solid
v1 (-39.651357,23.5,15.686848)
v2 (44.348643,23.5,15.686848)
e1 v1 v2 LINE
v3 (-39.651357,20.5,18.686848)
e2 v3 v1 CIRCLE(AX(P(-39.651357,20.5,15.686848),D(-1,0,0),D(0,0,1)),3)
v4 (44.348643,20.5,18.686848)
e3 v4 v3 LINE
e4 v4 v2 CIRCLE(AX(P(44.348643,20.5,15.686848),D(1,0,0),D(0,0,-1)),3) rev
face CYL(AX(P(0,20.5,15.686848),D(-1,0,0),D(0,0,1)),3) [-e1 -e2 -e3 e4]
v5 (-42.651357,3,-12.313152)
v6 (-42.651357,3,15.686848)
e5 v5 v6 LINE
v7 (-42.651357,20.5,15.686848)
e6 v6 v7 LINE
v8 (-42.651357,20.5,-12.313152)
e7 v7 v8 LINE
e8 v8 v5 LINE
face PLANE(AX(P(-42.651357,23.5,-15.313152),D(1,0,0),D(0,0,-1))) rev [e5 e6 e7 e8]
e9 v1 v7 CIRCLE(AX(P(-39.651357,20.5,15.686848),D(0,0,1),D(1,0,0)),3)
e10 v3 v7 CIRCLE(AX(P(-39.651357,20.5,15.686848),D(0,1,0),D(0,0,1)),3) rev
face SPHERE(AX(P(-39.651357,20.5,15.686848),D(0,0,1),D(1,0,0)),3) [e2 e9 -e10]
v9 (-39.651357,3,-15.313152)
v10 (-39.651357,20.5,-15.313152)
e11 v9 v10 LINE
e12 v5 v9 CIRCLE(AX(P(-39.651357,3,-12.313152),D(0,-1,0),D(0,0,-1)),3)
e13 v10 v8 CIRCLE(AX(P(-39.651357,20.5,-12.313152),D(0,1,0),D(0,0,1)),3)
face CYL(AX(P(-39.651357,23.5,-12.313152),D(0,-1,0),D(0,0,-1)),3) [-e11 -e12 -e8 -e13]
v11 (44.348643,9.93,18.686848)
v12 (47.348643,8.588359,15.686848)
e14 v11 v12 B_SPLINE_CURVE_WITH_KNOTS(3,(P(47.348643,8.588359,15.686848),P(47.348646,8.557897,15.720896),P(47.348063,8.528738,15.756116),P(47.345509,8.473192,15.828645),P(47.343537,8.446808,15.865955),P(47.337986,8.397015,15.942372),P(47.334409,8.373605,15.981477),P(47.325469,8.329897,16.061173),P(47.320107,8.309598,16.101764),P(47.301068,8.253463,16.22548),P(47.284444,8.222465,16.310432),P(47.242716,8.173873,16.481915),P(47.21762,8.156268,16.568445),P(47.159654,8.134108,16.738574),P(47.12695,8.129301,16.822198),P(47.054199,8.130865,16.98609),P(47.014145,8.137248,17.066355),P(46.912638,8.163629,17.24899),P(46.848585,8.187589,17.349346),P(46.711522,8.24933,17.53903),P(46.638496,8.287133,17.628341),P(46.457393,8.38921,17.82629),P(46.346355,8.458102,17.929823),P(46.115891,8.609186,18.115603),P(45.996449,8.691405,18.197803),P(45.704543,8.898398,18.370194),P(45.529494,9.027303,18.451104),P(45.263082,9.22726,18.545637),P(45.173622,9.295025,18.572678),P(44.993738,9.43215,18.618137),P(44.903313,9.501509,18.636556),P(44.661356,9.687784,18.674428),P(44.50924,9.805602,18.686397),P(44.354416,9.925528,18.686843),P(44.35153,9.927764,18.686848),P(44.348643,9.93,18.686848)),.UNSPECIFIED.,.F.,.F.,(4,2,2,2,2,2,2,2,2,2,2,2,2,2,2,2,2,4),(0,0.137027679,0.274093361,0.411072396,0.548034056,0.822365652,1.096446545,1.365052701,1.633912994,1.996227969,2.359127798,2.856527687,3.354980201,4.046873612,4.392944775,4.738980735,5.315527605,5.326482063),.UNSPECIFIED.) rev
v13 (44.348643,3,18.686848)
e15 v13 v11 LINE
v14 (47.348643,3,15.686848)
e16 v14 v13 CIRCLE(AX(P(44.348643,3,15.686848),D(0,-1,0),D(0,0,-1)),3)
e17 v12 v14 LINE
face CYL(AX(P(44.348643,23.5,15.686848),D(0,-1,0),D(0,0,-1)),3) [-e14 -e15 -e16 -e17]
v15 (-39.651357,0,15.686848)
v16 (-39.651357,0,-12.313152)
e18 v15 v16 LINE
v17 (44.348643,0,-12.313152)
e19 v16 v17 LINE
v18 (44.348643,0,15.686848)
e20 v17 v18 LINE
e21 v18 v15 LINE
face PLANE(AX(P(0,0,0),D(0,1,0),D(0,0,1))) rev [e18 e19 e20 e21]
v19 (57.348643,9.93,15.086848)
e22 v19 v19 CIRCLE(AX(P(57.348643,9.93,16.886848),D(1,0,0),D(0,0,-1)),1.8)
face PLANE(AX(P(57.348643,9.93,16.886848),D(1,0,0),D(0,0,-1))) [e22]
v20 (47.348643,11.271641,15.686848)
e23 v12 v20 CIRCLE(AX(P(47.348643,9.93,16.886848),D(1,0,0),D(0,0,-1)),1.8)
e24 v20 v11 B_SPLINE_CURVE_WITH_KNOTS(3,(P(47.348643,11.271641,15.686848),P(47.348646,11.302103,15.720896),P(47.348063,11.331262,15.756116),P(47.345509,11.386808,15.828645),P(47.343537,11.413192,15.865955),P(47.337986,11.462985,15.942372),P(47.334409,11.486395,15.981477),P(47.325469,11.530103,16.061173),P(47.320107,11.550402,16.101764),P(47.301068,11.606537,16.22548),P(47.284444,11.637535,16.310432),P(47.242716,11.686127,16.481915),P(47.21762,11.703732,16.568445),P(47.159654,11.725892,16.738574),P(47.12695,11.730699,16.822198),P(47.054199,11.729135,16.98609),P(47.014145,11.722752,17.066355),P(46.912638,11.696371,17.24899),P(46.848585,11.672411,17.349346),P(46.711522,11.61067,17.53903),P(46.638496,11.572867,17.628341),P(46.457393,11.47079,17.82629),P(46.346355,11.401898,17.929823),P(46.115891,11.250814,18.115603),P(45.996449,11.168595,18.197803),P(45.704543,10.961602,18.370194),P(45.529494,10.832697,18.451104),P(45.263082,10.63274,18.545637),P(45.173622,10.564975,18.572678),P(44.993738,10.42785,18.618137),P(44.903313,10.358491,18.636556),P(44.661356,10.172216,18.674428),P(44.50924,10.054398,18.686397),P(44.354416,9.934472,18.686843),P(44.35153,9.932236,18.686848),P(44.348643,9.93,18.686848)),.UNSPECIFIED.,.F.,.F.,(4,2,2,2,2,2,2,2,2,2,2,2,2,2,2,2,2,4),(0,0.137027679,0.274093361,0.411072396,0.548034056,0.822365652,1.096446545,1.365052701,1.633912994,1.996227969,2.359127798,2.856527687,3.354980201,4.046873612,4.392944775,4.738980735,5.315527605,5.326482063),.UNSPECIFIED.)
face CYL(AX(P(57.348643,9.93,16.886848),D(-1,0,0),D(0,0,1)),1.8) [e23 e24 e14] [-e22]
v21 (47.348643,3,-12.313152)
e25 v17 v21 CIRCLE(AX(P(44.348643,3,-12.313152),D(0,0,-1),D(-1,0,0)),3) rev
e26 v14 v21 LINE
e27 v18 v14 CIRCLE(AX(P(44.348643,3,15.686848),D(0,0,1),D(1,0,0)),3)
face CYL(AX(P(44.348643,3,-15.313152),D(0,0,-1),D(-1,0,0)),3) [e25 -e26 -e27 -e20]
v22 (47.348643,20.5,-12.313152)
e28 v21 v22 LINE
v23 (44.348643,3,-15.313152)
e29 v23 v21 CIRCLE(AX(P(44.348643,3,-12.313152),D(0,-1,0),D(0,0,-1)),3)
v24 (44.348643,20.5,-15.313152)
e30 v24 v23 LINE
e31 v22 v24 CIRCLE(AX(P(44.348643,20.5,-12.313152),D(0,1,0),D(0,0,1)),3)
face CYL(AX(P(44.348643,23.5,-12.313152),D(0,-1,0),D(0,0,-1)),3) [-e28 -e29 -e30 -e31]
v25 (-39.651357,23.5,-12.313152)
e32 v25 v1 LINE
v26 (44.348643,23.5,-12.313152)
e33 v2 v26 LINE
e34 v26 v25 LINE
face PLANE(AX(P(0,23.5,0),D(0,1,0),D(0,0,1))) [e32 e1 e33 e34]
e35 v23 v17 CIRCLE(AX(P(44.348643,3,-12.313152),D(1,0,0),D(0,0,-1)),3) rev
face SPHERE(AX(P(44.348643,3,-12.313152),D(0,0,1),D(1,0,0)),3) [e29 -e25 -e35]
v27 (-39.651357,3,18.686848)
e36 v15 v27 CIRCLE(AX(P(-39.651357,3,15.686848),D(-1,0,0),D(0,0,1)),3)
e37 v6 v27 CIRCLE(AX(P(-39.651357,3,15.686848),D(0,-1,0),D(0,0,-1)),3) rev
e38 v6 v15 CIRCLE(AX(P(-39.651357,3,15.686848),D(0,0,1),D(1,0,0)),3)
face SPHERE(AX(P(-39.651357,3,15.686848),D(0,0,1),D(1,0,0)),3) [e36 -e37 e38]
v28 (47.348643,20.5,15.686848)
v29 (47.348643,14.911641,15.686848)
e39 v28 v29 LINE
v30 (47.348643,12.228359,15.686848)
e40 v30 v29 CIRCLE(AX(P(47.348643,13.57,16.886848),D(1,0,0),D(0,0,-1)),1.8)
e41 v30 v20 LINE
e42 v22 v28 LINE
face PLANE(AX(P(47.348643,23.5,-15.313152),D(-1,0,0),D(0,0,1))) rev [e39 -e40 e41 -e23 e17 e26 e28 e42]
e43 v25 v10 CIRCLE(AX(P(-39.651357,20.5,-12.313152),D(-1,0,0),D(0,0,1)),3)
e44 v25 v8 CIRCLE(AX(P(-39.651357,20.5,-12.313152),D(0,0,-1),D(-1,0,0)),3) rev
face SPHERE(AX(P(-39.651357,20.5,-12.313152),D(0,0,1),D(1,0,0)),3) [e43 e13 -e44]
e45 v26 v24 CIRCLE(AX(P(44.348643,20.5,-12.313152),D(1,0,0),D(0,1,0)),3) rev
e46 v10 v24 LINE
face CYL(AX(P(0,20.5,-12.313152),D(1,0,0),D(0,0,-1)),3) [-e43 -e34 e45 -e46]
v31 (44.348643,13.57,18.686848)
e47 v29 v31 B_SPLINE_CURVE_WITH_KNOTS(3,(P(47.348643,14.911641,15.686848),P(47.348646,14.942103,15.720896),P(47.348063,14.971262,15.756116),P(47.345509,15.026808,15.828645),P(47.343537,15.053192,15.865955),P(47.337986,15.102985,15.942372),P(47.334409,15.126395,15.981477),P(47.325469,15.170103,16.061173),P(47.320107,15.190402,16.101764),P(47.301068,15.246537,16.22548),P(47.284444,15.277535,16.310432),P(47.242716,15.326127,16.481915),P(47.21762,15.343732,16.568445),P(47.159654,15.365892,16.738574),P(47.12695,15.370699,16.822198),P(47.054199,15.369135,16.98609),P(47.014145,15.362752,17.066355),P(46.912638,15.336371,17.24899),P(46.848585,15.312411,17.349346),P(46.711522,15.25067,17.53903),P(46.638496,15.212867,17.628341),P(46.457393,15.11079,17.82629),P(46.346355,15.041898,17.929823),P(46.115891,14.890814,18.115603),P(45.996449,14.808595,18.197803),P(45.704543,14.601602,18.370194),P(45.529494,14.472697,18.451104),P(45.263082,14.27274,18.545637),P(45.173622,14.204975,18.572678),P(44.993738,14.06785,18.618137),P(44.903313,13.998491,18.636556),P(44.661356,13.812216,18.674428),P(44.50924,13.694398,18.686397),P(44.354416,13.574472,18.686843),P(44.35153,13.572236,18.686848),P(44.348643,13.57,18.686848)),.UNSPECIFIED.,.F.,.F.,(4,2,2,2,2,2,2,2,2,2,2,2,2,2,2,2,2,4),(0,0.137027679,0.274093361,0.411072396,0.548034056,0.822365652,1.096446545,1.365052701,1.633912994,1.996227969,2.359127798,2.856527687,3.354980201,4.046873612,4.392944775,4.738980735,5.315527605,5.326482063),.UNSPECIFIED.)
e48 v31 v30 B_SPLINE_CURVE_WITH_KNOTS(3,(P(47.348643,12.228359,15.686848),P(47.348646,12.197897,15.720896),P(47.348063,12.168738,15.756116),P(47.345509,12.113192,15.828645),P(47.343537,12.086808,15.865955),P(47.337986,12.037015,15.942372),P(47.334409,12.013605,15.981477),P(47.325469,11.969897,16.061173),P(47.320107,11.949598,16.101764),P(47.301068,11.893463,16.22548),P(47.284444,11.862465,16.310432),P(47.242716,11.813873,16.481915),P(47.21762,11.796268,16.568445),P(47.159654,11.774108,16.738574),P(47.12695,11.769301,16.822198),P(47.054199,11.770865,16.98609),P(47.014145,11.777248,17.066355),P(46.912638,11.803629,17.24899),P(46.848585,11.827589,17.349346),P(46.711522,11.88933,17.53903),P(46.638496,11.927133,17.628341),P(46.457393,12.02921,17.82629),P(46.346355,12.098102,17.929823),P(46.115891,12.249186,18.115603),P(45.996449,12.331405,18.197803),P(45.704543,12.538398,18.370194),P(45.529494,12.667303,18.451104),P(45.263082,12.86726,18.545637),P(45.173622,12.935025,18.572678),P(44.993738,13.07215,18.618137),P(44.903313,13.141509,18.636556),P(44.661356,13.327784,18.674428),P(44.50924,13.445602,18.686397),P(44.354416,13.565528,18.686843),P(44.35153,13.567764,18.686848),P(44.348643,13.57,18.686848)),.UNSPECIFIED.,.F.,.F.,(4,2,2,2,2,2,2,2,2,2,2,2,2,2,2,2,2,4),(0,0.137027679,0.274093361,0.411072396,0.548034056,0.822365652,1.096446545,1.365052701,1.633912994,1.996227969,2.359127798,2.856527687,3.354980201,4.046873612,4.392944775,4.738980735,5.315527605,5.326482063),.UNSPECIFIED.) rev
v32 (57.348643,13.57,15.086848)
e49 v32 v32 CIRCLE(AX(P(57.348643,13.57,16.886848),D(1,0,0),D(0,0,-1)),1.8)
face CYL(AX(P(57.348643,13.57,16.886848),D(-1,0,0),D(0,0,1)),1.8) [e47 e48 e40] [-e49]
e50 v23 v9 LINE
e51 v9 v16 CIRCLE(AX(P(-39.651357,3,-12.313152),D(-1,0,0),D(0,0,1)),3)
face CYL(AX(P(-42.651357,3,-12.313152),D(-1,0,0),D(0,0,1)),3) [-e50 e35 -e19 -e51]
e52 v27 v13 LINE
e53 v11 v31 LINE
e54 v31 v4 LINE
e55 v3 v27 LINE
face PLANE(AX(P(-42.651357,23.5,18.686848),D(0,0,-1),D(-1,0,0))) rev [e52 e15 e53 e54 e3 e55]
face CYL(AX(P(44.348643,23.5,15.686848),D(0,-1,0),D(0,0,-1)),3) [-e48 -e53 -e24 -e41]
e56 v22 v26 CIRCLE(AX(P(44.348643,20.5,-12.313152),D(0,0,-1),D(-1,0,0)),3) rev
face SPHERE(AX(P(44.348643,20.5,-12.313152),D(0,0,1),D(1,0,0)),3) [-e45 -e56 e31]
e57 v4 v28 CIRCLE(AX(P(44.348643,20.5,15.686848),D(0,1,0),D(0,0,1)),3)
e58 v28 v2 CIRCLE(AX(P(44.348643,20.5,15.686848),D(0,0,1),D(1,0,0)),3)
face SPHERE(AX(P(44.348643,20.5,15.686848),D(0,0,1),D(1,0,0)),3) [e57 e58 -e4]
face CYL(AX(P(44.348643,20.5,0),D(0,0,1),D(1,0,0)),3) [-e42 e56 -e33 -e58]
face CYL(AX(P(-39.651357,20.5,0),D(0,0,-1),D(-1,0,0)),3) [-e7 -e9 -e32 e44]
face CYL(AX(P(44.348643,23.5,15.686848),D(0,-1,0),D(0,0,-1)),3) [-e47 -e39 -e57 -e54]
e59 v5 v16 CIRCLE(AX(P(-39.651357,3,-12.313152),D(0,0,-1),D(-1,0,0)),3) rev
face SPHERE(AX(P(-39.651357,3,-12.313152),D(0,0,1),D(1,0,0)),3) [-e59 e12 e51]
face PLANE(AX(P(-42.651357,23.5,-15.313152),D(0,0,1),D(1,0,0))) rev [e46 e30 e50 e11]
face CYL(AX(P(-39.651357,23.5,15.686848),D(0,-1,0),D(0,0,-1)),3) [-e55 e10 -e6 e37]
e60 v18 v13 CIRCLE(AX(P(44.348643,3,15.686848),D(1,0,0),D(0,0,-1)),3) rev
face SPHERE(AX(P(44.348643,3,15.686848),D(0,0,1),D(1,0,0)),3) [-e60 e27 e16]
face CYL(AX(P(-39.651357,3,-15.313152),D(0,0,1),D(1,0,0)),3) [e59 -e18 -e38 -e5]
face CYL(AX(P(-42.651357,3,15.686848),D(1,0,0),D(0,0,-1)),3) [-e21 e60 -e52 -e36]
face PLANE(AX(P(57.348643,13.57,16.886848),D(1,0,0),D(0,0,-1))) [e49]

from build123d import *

# Parameters (mm, degrees)
SKETCH1_W           = 90
SKETCH1_H           = 34
BOSS_EXTRUDE1_DEPTH = 23.5
SKETCH2_R           = 1.8
BOSS_EXTRUDE4_DEPTH = 10
FILLET1_R           = 3


with BuildPart() as part:
    # Sketch1 → Boss-Extrude1 (new body)
    with BuildSketch(Plane(origin=(0, 0, 0), x_dir=(1, 0, 0), z_dir=(0, 1, 0))):
        with Locations((2.348643006, -1.686847599)):
            Rectangle(SKETCH1_W, SKETCH1_H)
    extrude(amount=BOSS_EXTRUDE1_DEPTH)

    # Sketch2 → Boss-Extrude4 (add)
    with BuildSketch(Plane(origin=(47.348643006, 0, 0), x_dir=(0, 0, -1), z_dir=(1, 0, 0))):
        with Locations(Location((-16.886847599, 13.57, 0), (0, 0, 180))):
            Circle(SKETCH2_R)
        with Locations(Location((-16.886847599, 9.93, 0), (0, 0, 180))):
            Circle(SKETCH2_R)
    extrude(amount=BOSS_EXTRUDE4_DEPTH)

    # Fillet1
    # the kernel refuses this fillet: 3 mm, written as the material it takes off along each edge
    with BuildSketch(Plane(origin=(44.348643006, 20.5, -12.313152401), x_dir=(1, 0, 0), z_dir=(0, 0, -1))) as fillet1_piece_1_section:
        Polygon((0, 0), (FILLET1_R * 1.02, 0), (FILLET1_R * 1.02, -FILLET1_R * 1.02), (0, -FILLET1_R * 1.02), align=None)
    fillet1_piece_1 = extrude(amount=FILLET1_R * 1.02, mode=Mode.PRIVATE)
    fillet1_piece_1 = fillet1_piece_1 - Plane(origin=(44.348643006, 20.5, -12.313152401), x_dir=(-0.7071067811865475, -0.7071067811865475, 0), z_dir=(0, 0, -1)) * Sphere(FILLET1_R, mode=Mode.PRIVATE)
    add(fillet1_piece_1, mode=Mode.SUBTRACT)
    with BuildSketch(Plane(origin=(44.348643006, 20.5, 15.686847599), x_dir=(0, 1, 0), z_dir=(1, 0, 0))) as fillet1_piece_2_section:
        Polygon((0, 0), (FILLET1_R * 1.02, 0), (FILLET1_R * 1.02, FILLET1_R * 1.02), (0, FILLET1_R * 1.02), align=None)
    fillet1_piece_2 = extrude(amount=FILLET1_R * 1.02, mode=Mode.PRIVATE)
    fillet1_piece_2 = fillet1_piece_2 - Plane(origin=(44.348643006, 20.5, 15.686847599), x_dir=(0, -0.7071067811865475, -0.7071067811865475), z_dir=(1, 0, 0)) * Sphere(FILLET1_R, mode=Mode.PRIVATE)
    add(fillet1_piece_2, mode=Mode.SUBTRACT)
    with BuildSketch(Plane(origin=(-39.651356994, 20.5, -12.313152401), x_dir=(-1, 0, 0), z_dir=(0, 0, -1))) as fillet1_piece_3_section:
        Polygon((0, 0), (FILLET1_R * 1.02, 0), (FILLET1_R * 1.02, FILLET1_R * 1.02), (0, FILLET1_R * 1.02), align=None)
    fillet1_piece_3 = extrude(amount=FILLET1_R * 1.02, mode=Mode.PRIVATE)
    fillet1_piece_3 = fillet1_piece_3 - Plane(origin=(-39.651356994, 20.5, -12.313152401), x_dir=(0.7071067811865475, -0.7071067811865475, 0), z_dir=(0, 0, -1)) * Sphere(FILLET1_R, mode=Mode.PRIVATE)
    add(fillet1_piece_3, mode=Mode.SUBTRACT)
    with BuildSketch(Plane(origin=(44.348643006, 3, 15.686847599), x_dir=(0, -1, 0), z_dir=(1, 0, 0))) as fillet1_piece_4_section:
        Polygon((0, 0), (FILLET1_R * 1.02, 0), (FILLET1_R * 1.02, -FILLET1_R * 1.02), (0, -FILLET1_R * 1.02), align=None)
    fillet1_piece_4 = extrude(amount=FILLET1_R * 1.02, mode=Mode.PRIVATE)
    fillet1_piece_4 = fillet1_piece_4 - Plane(origin=(44.348643006, 3, 15.686847599), x_dir=(0, 0.7071067811865475, -0.7071067811865475), z_dir=(1, 0, 0)) * Sphere(FILLET1_R, mode=Mode.PRIVATE)
    add(fillet1_piece_4, mode=Mode.SUBTRACT)
    with BuildSketch(Plane(origin=(-39.651356994, 20.5, 15.686847599), x_dir=(0, 1, 0), z_dir=(-1, 0, 0))) as fillet1_piece_5_section:
        Polygon((0, 0), (FILLET1_R * 1.02, 0), (FILLET1_R * 1.02, -FILLET1_R * 1.02), (0, -FILLET1_R * 1.02), align=None)
    fillet1_piece_5 = extrude(amount=FILLET1_R * 1.02, mode=Mode.PRIVATE)
    fillet1_piece_5 = fillet1_piece_5 - Plane(origin=(-39.651356994, 20.5, 15.686847599), x_dir=(0, -0.7071067811865475, -0.7071067811865475), z_dir=(-1, 0, 0)) * Sphere(FILLET1_R, mode=Mode.PRIVATE)
    add(fillet1_piece_5, mode=Mode.SUBTRACT)
    with BuildSketch(Plane(origin=(-39.651356994, 3, -12.313152401), x_dir=(-1, 0, 0), z_dir=(0, 0, -1))) as fillet1_piece_6_section:
        Polygon((0, 0), (FILLET1_R * 1.02, 0), (FILLET1_R * 1.02, -FILLET1_R * 1.02), (0, -FILLET1_R * 1.02), align=None)
    fillet1_piece_6 = extrude(amount=FILLET1_R * 1.02, mode=Mode.PRIVATE)
    fillet1_piece_6 = fillet1_piece_6 - Plane(origin=(-39.651356994, 3, -12.313152401), x_dir=(0.7071067811865475, 0.7071067811865475, 0), z_dir=(0, 0, -1)) * Sphere(FILLET1_R, mode=Mode.PRIVATE)
    add(fillet1_piece_6, mode=Mode.SUBTRACT)
    with BuildSketch(Plane(origin=(44.348643006, 3, -12.313152401), x_dir=(1, 0, 0), z_dir=(0, 0, -1))) as fillet1_piece_7_section:
        Polygon((0, 0), (FILLET1_R * 1.02, 0), (FILLET1_R * 1.02, FILLET1_R * 1.02), (0, FILLET1_R * 1.02), align=None)
    fillet1_piece_7 = extrude(amount=FILLET1_R * 1.02, mode=Mode.PRIVATE)
    fillet1_piece_7 = fillet1_piece_7 - Plane(origin=(44.348643006, 3, -12.313152401), x_dir=(-0.7071067811865475, 0.7071067811865475, 0), z_dir=(0, 0, -1)) * Sphere(FILLET1_R, mode=Mode.PRIVATE)
    add(fillet1_piece_7, mode=Mode.SUBTRACT)
    with BuildSketch(Plane(origin=(-39.651356994, 3, 15.686847599), x_dir=(0, -1, 0), z_dir=(-1, 0, 0))) as fillet1_piece_8_section:
        Polygon((0, 0), (FILLET1_R * 1.02, 0), (FILLET1_R * 1.02, FILLET1_R * 1.02), (0, FILLET1_R * 1.02), align=None)
    fillet1_piece_8 = extrude(amount=FILLET1_R * 1.02, mode=Mode.PRIVATE)
    fillet1_piece_8 = fillet1_piece_8 - Plane(origin=(-39.651356994, 3, 15.686847599), x_dir=(0, 0.7071067811865475, -0.7071067811865475), z_dir=(-1, 0, 0)) * Sphere(FILLET1_R, mode=Mode.PRIVATE)
    add(fillet1_piece_8, mode=Mode.SUBTRACT)
    with BuildSketch(Plane(origin=(47.348643006, 23.5, -12.313152401), x_dir=(0, -1, 0), z_dir=(0, 0, 1)), Plane(origin=(-42.651356994, 23.5, 15.686847599), x_dir=(0, -1, 0), z_dir=(0, 0, -1))) as fillet1_piece_9:
        with BuildLine():
            CenterArc((FILLET1_R, -FILLET1_R), FILLET1_R, 90, 90)
            Line((0, -FILLET1_R), (0, 0))
            Line((0, 0), (FILLET1_R, 0))
        make_face()
    extrude(amount=28, mode=Mode.SUBTRACT)
    with BuildSketch(Plane(origin=(-39.651356994, 23.5, -15.313152401), x_dir=(0, -1, 0), z_dir=(1, 0, 0)), Plane(origin=(44.348643006, 0, 18.686847599), x_dir=(0, 0, -1), z_dir=(-1, 0, 0))) as fillet1_piece_10:
        with BuildLine():
            CenterArc((FILLET1_R, -FILLET1_R), FILLET1_R, 90, 90)
            Line((0, -FILLET1_R), (0, 0))
            Line((0, 0), (FILLET1_R, 0))
        make_face()
    extrude(amount=84, mode=Mode.SUBTRACT)
    with BuildSketch(Plane(origin=(47.348643006, 9.93, 18.686847599), x_dir=(0, 0, -1), z_dir=(0, 1, 0))) as fillet1_piece_11_section:
        with BuildLine():
            CenterArc((FILLET1_R, FILLET1_R), FILLET1_R, 180, 90)
            Line((0, FILLET1_R), (0, 0))
            Line((0, 0), (FILLET1_R, 0))
        make_face()
    fillet1_piece_11 = extrude(amount=3.64, mode=Mode.PRIVATE)
    fillet1_piece_11 = fillet1_piece_11 - Plane(origin=(46.419832721, 13.57, 16.886847599), x_dir=(0, 0, 1), z_dir=(-1, 0, 0)) * Cylinder(1.8, 20, mode=Mode.PRIVATE)
    fillet1_piece_11 = fillet1_piece_11 - Plane(origin=(46.419832721, 9.93, 16.886847599), x_dir=(0, 0, 1), z_dir=(-1, 0, 0)) * Cylinder(1.8, 20, mode=Mode.PRIVATE)
    add(fillet1_piece_11, mode=Mode.SUBTRACT)
    with BuildSketch(Plane(origin=(47.348643006, 3, 18.686847599), x_dir=(0, 0, -1), z_dir=(0, 1, 0))) as fillet1_piece_12_section:
        with BuildLine():
            CenterArc((FILLET1_R, FILLET1_R), FILLET1_R, 180, 90)
            Line((0, FILLET1_R), (0, 0))
            Line((0, 0), (FILLET1_R, 0))
        make_face()
    fillet1_piece_12 = extrude(amount=6.93, mode=Mode.PRIVATE)
    fillet1_piece_12 = fillet1_piece_12 - Plane(origin=(46.65046867, 9.93, 16.886847599), x_dir=(0, 0, 1), z_dir=(-1, 0, 0)) * Cylinder(1.8, 26, mode=Mode.PRIVATE)
    add(fillet1_piece_12, mode=Mode.SUBTRACT)
    with BuildSketch(Plane(origin=(-39.651356994, 0, -15.313152401), x_dir=(0, 1, 0), z_dir=(1, 0, 0)), Plane(origin=(44.348643006, 23.5, 18.686847599), x_dir=(0, 0, -1), z_dir=(-1, 0, 0))) as fillet1_piece_13:
        with BuildLine():
            CenterArc((FILLET1_R, FILLET1_R), FILLET1_R, 180, 90)
            Line((0, FILLET1_R), (0, 0))
            Line((0, 0), (FILLET1_R, 0))
        make_face()
    extrude(amount=84, mode=Mode.SUBTRACT)
    with BuildSketch(Plane(origin=(47.348643006, 0, -12.313152401), x_dir=(0, 1, 0), z_dir=(0, 0, 1)), Plane(origin=(-42.651356994, 0, 15.686847599), x_dir=(0, 1, 0), z_dir=(0, 0, -1))) as fillet1_piece_14:
        with BuildLine():
            CenterArc((FILLET1_R, FILLET1_R), FILLET1_R, 180, 90)
            Line((0, FILLET1_R), (0, 0))
            Line((0, 0), (FILLET1_R, 0))
        make_face()
    extrude(amount=28, mode=Mode.SUBTRACT)
    with BuildSketch(Plane(origin=(-42.651356994, 3, -15.313152401), x_dir=(1, 0, 0), z_dir=(0, 1, 0)), Plane(origin=(-42.651356994, 3, 18.686847599), x_dir=(0, 0, -1), z_dir=(0, 1, 0))) as fillet1_piece_15:
        with BuildLine():
            CenterArc((FILLET1_R, -FILLET1_R), FILLET1_R, 90, 90)
            Line((0, -FILLET1_R), (0, 0))
            Line((0, 0), (FILLET1_R, 0))
        make_face()
    extrude(amount=17.5, mode=Mode.SUBTRACT)
    with BuildSketch(Plane(origin=(47.348643006, 3, -15.313152401), x_dir=(-1, 0, 0), z_dir=(0, 1, 0))) as fillet1_piece_16:
        with BuildLine():
            CenterArc((FILLET1_R, FILLET1_R), FILLET1_R, 180, 90)
            Line((0, FILLET1_R), (0, 0))
            Line((0, 0), (FILLET1_R, 0))
        make_face()
    extrude(amount=17.5, mode=Mode.SUBTRACT)
    with BuildSketch(Plane(origin=(47.348643006, 13.57, 18.686847599), x_dir=(0, 0, -1), z_dir=(0, 1, 0))) as fillet1_piece_17_section:
        with BuildLine():
            CenterArc((FILLET1_R, FILLET1_R), FILLET1_R, 180, 90)
            Line((0, FILLET1_R), (0, 0))
            Line((0, 0), (FILLET1_R, 0))
        make_face()
    fillet1_piece_17 = extrude(amount=6.93, mode=Mode.PRIVATE)
    fillet1_piece_17 = fillet1_piece_17 - Plane(origin=(46.65046859, 13.57, 16.886847599), x_dir=(0, 0, 1), z_dir=(-1, 0, 0)) * Cylinder(1.8, 26, mode=Mode.PRIVATE)
    add(fillet1_piece_17, mode=Mode.SUBTRACT)


solid = part.part
